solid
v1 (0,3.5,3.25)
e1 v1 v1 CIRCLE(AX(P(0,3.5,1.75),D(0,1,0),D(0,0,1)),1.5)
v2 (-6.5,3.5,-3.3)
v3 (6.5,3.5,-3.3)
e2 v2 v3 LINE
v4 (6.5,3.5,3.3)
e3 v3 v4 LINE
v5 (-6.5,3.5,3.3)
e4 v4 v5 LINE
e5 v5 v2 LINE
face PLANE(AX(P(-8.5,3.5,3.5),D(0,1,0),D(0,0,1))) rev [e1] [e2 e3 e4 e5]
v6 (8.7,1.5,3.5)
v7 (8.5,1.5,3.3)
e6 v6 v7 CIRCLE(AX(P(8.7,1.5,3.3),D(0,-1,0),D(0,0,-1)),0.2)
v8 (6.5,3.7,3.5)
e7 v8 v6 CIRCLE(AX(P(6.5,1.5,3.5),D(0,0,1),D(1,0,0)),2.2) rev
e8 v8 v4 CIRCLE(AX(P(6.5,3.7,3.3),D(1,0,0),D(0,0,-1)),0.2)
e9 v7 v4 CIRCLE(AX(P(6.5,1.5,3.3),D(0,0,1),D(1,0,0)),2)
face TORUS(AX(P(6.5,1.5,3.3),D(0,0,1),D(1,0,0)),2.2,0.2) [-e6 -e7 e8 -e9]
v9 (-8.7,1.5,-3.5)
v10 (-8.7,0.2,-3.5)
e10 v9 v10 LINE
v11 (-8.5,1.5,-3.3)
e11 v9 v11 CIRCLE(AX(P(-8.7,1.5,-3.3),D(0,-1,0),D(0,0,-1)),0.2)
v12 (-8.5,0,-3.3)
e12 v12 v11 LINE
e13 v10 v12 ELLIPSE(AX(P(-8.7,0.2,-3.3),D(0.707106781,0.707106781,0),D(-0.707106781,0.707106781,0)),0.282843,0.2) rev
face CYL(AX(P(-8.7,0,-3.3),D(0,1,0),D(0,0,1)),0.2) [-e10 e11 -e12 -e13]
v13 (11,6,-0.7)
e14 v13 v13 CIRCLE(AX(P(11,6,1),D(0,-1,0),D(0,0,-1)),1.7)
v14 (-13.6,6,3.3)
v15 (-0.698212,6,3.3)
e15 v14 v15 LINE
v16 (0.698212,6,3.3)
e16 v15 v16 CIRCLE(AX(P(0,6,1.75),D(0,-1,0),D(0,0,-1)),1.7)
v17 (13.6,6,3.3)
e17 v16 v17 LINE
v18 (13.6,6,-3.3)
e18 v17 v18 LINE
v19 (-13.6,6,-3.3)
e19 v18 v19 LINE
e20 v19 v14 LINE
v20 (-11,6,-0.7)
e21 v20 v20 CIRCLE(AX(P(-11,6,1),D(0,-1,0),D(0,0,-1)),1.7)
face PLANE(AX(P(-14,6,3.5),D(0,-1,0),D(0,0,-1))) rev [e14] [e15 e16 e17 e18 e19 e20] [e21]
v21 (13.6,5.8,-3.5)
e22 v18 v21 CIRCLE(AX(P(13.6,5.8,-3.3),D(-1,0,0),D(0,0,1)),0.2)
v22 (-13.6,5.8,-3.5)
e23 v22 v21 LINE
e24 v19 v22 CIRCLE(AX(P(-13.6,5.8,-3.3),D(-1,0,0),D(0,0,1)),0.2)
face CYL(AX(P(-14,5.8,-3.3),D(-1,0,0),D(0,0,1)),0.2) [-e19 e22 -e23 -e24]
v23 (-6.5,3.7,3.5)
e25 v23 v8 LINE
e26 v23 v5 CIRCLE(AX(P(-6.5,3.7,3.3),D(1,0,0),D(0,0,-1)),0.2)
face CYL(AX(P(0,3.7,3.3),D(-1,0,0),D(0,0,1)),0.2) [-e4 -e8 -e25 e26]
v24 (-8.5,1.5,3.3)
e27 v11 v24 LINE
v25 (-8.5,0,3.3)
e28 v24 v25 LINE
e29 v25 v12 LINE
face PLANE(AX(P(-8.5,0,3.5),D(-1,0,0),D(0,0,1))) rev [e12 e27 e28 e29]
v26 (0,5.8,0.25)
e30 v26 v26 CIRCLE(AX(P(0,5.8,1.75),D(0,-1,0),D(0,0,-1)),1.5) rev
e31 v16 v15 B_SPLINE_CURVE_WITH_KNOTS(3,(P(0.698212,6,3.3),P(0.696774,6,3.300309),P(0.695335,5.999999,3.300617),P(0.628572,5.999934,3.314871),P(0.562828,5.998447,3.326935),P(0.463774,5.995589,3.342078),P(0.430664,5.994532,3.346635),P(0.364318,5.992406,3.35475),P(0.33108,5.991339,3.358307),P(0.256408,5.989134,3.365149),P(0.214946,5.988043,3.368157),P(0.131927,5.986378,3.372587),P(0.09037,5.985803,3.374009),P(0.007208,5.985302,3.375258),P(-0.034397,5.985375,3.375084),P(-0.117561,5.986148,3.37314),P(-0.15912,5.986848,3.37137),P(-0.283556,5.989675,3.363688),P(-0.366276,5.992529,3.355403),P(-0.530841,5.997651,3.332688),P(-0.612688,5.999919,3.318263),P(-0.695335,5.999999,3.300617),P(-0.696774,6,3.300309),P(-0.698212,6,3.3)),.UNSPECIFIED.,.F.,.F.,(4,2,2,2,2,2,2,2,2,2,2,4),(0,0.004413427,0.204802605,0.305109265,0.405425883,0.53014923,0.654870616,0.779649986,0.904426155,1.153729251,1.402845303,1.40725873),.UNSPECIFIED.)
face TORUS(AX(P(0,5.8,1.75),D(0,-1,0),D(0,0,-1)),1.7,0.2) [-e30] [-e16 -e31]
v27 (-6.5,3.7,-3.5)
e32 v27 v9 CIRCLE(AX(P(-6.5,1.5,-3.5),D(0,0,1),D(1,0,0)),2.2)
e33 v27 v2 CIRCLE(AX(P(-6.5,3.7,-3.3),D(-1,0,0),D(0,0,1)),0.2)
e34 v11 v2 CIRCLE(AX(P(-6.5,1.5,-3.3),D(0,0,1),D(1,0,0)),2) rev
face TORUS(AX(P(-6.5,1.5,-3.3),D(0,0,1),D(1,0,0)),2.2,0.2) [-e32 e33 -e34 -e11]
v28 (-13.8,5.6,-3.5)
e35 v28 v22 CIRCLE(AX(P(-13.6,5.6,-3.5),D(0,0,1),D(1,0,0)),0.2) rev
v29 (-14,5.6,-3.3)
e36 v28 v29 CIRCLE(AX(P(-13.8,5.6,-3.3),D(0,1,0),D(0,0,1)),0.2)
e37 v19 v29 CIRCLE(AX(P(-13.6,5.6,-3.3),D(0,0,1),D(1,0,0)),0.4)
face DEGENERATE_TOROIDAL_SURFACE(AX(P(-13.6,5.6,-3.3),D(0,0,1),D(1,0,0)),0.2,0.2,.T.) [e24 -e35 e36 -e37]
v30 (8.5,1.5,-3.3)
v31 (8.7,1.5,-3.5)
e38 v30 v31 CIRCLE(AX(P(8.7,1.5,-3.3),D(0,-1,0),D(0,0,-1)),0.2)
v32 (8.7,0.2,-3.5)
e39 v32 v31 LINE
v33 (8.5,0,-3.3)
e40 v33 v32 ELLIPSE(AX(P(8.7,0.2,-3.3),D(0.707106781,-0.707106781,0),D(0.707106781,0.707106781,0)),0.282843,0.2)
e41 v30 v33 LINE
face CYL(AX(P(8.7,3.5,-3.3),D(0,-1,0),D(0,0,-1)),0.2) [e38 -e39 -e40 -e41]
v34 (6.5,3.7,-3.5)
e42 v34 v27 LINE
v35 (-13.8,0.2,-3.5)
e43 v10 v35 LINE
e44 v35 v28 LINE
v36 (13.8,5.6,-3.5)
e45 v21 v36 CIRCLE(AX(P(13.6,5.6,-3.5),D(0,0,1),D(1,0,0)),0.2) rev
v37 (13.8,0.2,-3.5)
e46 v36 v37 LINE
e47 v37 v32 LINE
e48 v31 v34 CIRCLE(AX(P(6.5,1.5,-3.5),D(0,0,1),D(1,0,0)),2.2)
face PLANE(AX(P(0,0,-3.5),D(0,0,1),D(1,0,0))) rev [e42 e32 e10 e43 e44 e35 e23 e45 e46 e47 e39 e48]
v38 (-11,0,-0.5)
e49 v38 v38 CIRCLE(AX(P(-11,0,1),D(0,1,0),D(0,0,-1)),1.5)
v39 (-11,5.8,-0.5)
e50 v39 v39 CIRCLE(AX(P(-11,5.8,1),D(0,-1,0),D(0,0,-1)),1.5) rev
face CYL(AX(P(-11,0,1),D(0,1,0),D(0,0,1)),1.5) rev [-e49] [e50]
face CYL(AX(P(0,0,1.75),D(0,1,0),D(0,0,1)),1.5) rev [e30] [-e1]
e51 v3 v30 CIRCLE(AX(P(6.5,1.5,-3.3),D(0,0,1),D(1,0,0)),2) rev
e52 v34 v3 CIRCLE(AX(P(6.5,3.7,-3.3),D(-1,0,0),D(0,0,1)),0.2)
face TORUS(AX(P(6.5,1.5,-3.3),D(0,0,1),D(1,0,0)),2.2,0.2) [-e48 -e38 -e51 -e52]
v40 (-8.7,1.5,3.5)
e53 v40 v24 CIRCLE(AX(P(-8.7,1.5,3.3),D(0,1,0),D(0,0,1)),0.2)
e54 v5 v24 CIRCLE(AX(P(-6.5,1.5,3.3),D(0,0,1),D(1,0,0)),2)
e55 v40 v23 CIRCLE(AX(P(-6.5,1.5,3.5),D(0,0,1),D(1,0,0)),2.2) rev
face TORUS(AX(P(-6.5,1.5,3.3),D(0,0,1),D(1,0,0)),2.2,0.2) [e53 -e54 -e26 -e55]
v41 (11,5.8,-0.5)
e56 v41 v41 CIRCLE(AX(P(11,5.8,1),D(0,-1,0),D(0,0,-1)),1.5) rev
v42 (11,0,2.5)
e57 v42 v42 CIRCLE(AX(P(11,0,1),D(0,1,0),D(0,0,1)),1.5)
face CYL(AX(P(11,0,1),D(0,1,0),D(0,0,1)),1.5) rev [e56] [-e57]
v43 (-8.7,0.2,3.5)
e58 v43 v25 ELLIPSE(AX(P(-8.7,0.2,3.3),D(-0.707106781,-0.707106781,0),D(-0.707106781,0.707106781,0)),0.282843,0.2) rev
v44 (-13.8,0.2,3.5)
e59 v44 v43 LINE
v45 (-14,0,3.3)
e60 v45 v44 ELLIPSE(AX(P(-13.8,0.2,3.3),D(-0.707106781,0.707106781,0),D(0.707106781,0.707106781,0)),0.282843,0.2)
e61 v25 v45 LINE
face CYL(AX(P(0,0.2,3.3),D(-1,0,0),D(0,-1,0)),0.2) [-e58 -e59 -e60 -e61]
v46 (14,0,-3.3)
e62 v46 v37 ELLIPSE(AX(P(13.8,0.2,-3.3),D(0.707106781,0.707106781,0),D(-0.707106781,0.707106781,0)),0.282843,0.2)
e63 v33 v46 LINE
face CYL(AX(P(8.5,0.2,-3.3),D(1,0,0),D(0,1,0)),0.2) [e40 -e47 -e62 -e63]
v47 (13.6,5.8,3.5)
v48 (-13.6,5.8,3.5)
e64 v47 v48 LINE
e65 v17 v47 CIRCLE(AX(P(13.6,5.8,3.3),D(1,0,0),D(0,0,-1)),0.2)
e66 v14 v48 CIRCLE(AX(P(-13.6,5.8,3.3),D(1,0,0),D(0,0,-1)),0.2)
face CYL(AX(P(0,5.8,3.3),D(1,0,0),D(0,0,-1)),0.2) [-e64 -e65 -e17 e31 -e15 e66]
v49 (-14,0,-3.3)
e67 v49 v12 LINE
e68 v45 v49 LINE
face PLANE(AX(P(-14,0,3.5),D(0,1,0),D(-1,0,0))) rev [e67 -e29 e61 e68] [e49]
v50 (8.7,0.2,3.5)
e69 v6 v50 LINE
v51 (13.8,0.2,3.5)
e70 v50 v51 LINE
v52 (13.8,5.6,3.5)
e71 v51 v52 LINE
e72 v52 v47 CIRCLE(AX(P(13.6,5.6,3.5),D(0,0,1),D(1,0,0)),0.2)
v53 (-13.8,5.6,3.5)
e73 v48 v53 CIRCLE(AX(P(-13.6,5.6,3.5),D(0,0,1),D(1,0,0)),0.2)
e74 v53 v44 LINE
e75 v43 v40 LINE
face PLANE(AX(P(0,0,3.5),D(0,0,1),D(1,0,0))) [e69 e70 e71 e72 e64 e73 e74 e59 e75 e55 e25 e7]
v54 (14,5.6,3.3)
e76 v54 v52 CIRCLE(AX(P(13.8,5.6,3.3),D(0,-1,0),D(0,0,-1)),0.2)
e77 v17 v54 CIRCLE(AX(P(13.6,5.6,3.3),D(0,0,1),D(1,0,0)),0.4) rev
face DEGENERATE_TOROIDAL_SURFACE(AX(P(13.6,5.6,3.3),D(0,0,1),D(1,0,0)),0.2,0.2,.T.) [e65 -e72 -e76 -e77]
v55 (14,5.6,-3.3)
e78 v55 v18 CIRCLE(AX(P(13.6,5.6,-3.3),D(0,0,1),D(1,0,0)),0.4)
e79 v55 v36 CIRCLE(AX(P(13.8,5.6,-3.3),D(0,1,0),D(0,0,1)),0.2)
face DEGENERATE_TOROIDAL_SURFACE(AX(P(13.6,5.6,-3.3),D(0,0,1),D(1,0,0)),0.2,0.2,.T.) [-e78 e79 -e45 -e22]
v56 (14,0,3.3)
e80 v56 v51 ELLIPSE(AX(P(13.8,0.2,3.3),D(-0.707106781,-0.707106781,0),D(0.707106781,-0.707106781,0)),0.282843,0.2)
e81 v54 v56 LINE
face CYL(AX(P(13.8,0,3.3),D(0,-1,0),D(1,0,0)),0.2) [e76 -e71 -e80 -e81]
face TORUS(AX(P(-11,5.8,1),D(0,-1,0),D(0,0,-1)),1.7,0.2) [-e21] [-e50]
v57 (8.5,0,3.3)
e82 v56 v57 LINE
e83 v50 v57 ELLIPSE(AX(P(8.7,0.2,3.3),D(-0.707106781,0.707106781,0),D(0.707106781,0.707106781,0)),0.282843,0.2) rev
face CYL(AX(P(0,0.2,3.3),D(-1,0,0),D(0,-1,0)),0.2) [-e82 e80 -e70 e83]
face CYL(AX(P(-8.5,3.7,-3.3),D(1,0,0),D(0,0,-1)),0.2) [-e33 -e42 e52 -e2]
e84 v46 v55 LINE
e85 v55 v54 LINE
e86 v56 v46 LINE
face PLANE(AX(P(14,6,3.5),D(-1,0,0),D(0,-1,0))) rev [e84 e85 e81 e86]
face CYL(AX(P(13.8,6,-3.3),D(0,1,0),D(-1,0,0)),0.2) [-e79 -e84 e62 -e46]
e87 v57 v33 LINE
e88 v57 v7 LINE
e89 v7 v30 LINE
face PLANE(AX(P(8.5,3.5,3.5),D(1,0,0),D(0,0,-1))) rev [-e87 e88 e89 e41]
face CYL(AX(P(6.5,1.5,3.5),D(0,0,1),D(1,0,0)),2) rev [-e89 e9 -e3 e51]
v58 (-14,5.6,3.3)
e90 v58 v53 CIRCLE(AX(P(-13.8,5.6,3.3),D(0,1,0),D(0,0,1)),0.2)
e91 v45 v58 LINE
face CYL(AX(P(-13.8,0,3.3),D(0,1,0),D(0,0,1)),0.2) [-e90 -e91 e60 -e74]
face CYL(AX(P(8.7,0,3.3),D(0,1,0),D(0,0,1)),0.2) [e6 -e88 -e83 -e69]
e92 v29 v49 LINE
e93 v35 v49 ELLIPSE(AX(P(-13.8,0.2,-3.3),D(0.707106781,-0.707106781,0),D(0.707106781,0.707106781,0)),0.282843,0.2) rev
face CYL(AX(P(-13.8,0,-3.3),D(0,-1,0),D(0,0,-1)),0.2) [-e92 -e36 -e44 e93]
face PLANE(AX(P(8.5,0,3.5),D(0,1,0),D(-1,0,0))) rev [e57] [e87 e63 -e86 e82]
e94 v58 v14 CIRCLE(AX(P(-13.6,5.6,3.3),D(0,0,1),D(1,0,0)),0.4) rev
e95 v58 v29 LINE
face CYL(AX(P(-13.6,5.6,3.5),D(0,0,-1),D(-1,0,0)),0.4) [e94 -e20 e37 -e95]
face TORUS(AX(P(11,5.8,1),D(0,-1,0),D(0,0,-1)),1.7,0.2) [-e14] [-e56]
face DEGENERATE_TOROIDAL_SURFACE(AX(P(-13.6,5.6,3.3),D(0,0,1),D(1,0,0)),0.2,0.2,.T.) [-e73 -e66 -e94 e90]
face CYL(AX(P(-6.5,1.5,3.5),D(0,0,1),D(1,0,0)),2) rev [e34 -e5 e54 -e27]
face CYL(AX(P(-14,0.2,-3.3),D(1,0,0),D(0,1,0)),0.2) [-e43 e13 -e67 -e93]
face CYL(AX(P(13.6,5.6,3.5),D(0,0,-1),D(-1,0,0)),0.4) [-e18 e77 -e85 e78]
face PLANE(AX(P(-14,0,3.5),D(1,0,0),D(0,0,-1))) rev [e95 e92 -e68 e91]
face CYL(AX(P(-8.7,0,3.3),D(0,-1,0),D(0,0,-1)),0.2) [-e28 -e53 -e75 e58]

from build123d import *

# Parameters (mm, degrees)
BOSS_EXTRUDE1_DEPTH = 3.5
SKETCH2_R           = 1.5
CUT_EXTRUDE1_DEPTH  = 16.628499608
FILLET1_R           = 2
FILLET2_R           = 0.4
FILLET3_R           = 0.2


with BuildPart() as part:
    # Sketch1 → Boss-Extrude1 (new, symmetric)
    with BuildSketch(Plane.XY):
        Polygon((-14, 0), (-14, 6), (14, 6), (14, 0), (8.5, 0), (8.5, 3.5), (-8.5, 3.5), (-8.5, 0), align=None)
    extrude(amount=BOSS_EXTRUDE1_DEPTH, both=True)

    # Sketch2 → Cut-Extrude1 (cut, through all)
    with BuildSketch(Plane(origin=(0, 6, 0), x_dir=(1, 0, 0), z_dir=(0, 1, 0))):
        with Locations(Location((11, -1, 0), (0, 0, 270))):
            Circle(SKETCH2_R)
        with Locations(Location((-11, -1, 0), (0, 0, 90))):
            Circle(SKETCH2_R)
        with Locations(Location((0, -1.75, 0), (0, 0, 270))):
            Circle(SKETCH2_R)
    extrude(amount=-CUT_EXTRUDE1_DEPTH, mode=Mode.SUBTRACT)

    # Fillet1
    fillet1_edges = [part.edges().sort_by_distance(p)[0] for p in [
        (8.5, 3.5, 0),
        (-8.5, 3.5, 0),
    ]]
    fillet(fillet1_edges, radius=FILLET1_R)

    # Fillet2
    fillet2_edges = [part.edges().sort_by_distance(p)[0] for p in [
        (-14, 6, 0),
        (14, 6, 0),
    ]]
    fillet(fillet2_edges, radius=FILLET2_R)

    # Fillet3
    # the kernel refuses this fillet: 0.2 mm, written as the material it takes off along each edge
    with BuildSketch(Plane(origin=(-8.5, 1.5, -3.5), x_dir=(-1, 0, 0), z_dir=(0, -1, 0)), Plane(origin=(8.5, -0.5, -3.5), x_dir=(1, 0, 0), z_dir=(0, 1, 0)), Plane(origin=(8.5, -0.5, 3.5), x_dir=(0, 0, -1), z_dir=(0, 1, 0)), Plane(origin=(-8.5, 1.5, 3.5), x_dir=(0, 0, -1), z_dir=(0, -1, 0))) as fillet3_piece_1:
        with BuildLine():
            CenterArc((FILLET3_R, -FILLET3_R), FILLET3_R, 90, 90)
            Line((0, -FILLET3_R), (0, 0))
            Line((0, 0), (FILLET3_R, 0))
        make_face()
    extrude(amount=2, mode=Mode.SUBTRACT)
    with BuildSketch(Plane(origin=(-8, 0, -3.5), x_dir=(0, 1, 0), z_dir=(-1, 0, 0)), Plane(origin=(14.5, 0, 3.5), x_dir=(0, 0, -1), z_dir=(-1, 0, 0)), Plane(origin=(-8, 0, 3.5), x_dir=(0, 0, -1), z_dir=(-1, 0, 0)), Plane(origin=(14.5, 0, -3.5), x_dir=(0, 1, 0), z_dir=(-1, 0, 0))) as fillet3_piece_2:
        with BuildLine():
            CenterArc((FILLET3_R, -FILLET3_R), FILLET3_R, 90, 90)
            Line((0, -FILLET3_R), (0, 0))
            Line((0, 0), (FILLET3_R, 0))
        make_face()
    extrude(amount=6.5, mode=Mode.SUBTRACT)
    with BuildSketch(Plane(origin=(14, 5.6, 3.5), x_dir=(0, 0, -1), z_dir=(0, -1, 0)), Plane(origin=(-14, -0.5, -3.5), x_dir=(1, 0, 0), z_dir=(0, 1, 0)), Plane(origin=(-14, -0.5, 3.5), x_dir=(0, 0, -1), z_dir=(0, 1, 0)), Plane(origin=(14, 5.6, -3.5), x_dir=(-1, 0, 0), z_dir=(0, -1, 0))) as fillet3_piece_3:
        with BuildLine():
            CenterArc((FILLET3_R, -FILLET3_R), FILLET3_R, 90, 90)
            Line((0, -FILLET3_R), (0, 0))
            Line((0, 0), (FILLET3_R, 0))
        make_face()
    extrude(amount=6.1, mode=Mode.SUBTRACT)
    with BuildSketch(Plane(origin=(11, 6, 1), x_dir=(0, 0, 1), z_dir=(-1, 0, 0))) as fillet3_piece_4:
        with BuildLine():
            CenterArc((1.5 + FILLET3_R, -FILLET3_R), FILLET3_R, 90, 90)
            Line((1.5, -FILLET3_R), (1.5, 0))
            Line((1.5, 0), (1.5 + FILLET3_R, 0))
        make_face()
    revolve(axis=Axis((11, 6, 1), (0, 1, 0)), mode=Mode.SUBTRACT)
    with BuildSketch(Plane(origin=(-11, 6, 1), x_dir=(0, 0, -1), z_dir=(1, 0, 0))) as fillet3_piece_5:
        with BuildLine():
            CenterArc((1.5 + FILLET3_R, -FILLET3_R), FILLET3_R, 90, 90)
            Line((1.5, -FILLET3_R), (1.5, 0))
            Line((1.5, 0), (1.5 + FILLET3_R, 0))
        make_face()
    revolve(axis=Axis((-11, 6, 1), (0, 1, 0)), mode=Mode.SUBTRACT)
    with BuildSketch(Plane(origin=(0, 6, 1.75), x_dir=(0, 0, 1), z_dir=(-1, 0, 0))) as fillet3_piece_6:
        with BuildLine():
            CenterArc((1.5 + FILLET3_R, -FILLET3_R), FILLET3_R, 90, 90)
            Line((1.5, -FILLET3_R), (1.5, 0))
            Line((1.5, 0), (1.5 + FILLET3_R, 0))
        make_face()
    revolve(axis=Axis((0, 6, 1.75), (0, 1, 0)), mode=Mode.SUBTRACT)
    with BuildSketch(Plane(origin=(6.5, 3.5, -3.5), x_dir=(0, 1, 0), z_dir=(-1, 0, 0)), Plane(origin=(6.5, 3.5, 3.5), x_dir=(0, 0, -1), z_dir=(-1, 0, 0))) as fillet3_piece_7:
        with BuildLine():
            CenterArc((FILLET3_R, -FILLET3_R), FILLET3_R, 90, 90)
            Line((0, -FILLET3_R), (0, 0))
            Line((0, 0), (FILLET3_R, 0))
        make_face()
    extrude(amount=13, mode=Mode.SUBTRACT)
    with BuildSketch(Plane(origin=(6.5, 1.5, -3.5), x_dir=(1, 0, 0), z_dir=(0, -1, 0))) as fillet3_piece_8:
        with BuildLine():
            CenterArc((2 + FILLET3_R, FILLET3_R), FILLET3_R, 180, 90)
            Line((2, FILLET3_R), (2, 0))
            Line((2, 0), (2 + FILLET3_R, 0))
        make_face()
    revolve(axis=Axis((6.5, 1.5, -3.5), (0, 0, 1)), revolution_arc=90, mode=Mode.SUBTRACT)
    with BuildSketch(Plane(origin=(6.5, 1.5, 3.5), x_dir=(1, 0, 0), z_dir=(0, -1, 0))) as fillet3_piece_9:
        with BuildLine():
            CenterArc((2 + FILLET3_R, -FILLET3_R), FILLET3_R, 90, 90)
            Line((2 + FILLET3_R, 0), (2, 0))
            Line((2, 0), (2, -FILLET3_R))
        make_face()
    revolve(axis=Axis((6.5, 1.5, 3.5), (0, 0, 1)), revolution_arc=90, mode=Mode.SUBTRACT)
    with BuildSketch(Plane(origin=(-6.5, 1.5, -3.5), x_dir=(-1, 0, 0), z_dir=(0, -1, 0))) as fillet3_piece_10:
        with BuildLine():
            CenterArc((2 + FILLET3_R, -FILLET3_R), FILLET3_R, 90, 90)
            Line((2, -FILLET3_R), (2, 0))
            Line((2, 0), (2 + FILLET3_R, 0))
        make_face()
    revolve(axis=Axis((-6.5, 1.5, -3.5), (0, 0, -1)), revolution_arc=90, mode=Mode.SUBTRACT)
    with BuildSketch(Plane(origin=(-6.5, 1.5, 3.5), x_dir=(-1, 0, 0), z_dir=(0, -1, 0))) as fillet3_piece_11:
        with BuildLine():
            CenterArc((2 + FILLET3_R, FILLET3_R), FILLET3_R, 180, 90)
            Line((2 + FILLET3_R, 0), (2, 0))
            Line((2, 0), (2, FILLET3_R))
        make_face()
    revolve(axis=Axis((-6.5, 1.5, 3.5), (0, 0, -1)), revolution_arc=90, mode=Mode.SUBTRACT)
    with BuildSketch(Plane(origin=(-13.6, 6, -3.5), x_dir=(0, -1, 0), z_dir=(1, 0, 0)), Plane(origin=(-13.6, 6, 3.5), x_dir=(0, 0, -1), z_dir=(1, 0, 0))) as fillet3_piece_12:
        with BuildLine():
            CenterArc((FILLET3_R, -FILLET3_R), FILLET3_R, 90, 90)
            Line((0, -FILLET3_R), (0, 0))
            Line((0, 0), (FILLET3_R, 0))
        make_face()
    extrude(amount=27.2, mode=Mode.SUBTRACT)
    with BuildSketch(Plane(origin=(-13.6, 5.6, -3.5), x_dir=(0, 1, 0), z_dir=(1, 0, 0))) as fillet3_piece_13:
        with BuildLine():
            CenterArc((0.4 - FILLET3_R, FILLET3_R), FILLET3_R, 270, 90)
            Line((0.4, FILLET3_R), (0.4, 0))
            Line((0.4, 0), (0.4 - FILLET3_R, 0))
        make_face()
    revolve(axis=Axis((-13.6, 5.6, -3.5), (0, 0, 1)), revolution_arc=90, mode=Mode.SUBTRACT)
    with BuildSketch(Plane(origin=(13.6, 5.6, -3.5), x_dir=(1, 0, 0), z_dir=(0, -1, 0))) as fillet3_piece_14:
        with BuildLine():
            CenterArc((0.4 - FILLET3_R, FILLET3_R), FILLET3_R, 270, 90)
            Line((0.4, FILLET3_R), (0.4, 0))
            Line((0.4, 0), (0.4 - FILLET3_R, 0))
        make_face()
    revolve(axis=Axis((13.6, 5.6, -3.5), (0, 0, 1)), revolution_arc=90, mode=Mode.SUBTRACT)
    with BuildSketch(Plane(origin=(-13.6, 5.6, 3.5), x_dir=(0, 1, 0), z_dir=(1, 0, 0))) as fillet3_piece_15:
        with BuildLine():
            CenterArc((0.4 - FILLET3_R, -FILLET3_R), FILLET3_R, 0, 90)
            Line((0.4 - FILLET3_R, 0), (0.4, 0))
            Line((0.4, 0), (0.4, -FILLET3_R))
        make_face()
    revolve(axis=Axis((-13.6, 5.6, 3.5), (0, 0, 1)), revolution_arc=90, mode=Mode.SUBTRACT)
    with BuildSketch(Plane(origin=(13.6, 5.6, 3.5), x_dir=(1, 0, 0), z_dir=(0, -1, 0))) as fillet3_piece_16:
        with BuildLine():
            CenterArc((0.4 - FILLET3_R, -FILLET3_R), FILLET3_R, 0, 90)
            Line((0.4 - FILLET3_R, 0), (0.4, 0))
            Line((0.4, 0), (0.4, -FILLET3_R))
        make_face()
    revolve(axis=Axis((13.6, 5.6, 3.5), (0, 0, 1)), revolution_arc=90, mode=Mode.SUBTRACT)


solid = part.part
